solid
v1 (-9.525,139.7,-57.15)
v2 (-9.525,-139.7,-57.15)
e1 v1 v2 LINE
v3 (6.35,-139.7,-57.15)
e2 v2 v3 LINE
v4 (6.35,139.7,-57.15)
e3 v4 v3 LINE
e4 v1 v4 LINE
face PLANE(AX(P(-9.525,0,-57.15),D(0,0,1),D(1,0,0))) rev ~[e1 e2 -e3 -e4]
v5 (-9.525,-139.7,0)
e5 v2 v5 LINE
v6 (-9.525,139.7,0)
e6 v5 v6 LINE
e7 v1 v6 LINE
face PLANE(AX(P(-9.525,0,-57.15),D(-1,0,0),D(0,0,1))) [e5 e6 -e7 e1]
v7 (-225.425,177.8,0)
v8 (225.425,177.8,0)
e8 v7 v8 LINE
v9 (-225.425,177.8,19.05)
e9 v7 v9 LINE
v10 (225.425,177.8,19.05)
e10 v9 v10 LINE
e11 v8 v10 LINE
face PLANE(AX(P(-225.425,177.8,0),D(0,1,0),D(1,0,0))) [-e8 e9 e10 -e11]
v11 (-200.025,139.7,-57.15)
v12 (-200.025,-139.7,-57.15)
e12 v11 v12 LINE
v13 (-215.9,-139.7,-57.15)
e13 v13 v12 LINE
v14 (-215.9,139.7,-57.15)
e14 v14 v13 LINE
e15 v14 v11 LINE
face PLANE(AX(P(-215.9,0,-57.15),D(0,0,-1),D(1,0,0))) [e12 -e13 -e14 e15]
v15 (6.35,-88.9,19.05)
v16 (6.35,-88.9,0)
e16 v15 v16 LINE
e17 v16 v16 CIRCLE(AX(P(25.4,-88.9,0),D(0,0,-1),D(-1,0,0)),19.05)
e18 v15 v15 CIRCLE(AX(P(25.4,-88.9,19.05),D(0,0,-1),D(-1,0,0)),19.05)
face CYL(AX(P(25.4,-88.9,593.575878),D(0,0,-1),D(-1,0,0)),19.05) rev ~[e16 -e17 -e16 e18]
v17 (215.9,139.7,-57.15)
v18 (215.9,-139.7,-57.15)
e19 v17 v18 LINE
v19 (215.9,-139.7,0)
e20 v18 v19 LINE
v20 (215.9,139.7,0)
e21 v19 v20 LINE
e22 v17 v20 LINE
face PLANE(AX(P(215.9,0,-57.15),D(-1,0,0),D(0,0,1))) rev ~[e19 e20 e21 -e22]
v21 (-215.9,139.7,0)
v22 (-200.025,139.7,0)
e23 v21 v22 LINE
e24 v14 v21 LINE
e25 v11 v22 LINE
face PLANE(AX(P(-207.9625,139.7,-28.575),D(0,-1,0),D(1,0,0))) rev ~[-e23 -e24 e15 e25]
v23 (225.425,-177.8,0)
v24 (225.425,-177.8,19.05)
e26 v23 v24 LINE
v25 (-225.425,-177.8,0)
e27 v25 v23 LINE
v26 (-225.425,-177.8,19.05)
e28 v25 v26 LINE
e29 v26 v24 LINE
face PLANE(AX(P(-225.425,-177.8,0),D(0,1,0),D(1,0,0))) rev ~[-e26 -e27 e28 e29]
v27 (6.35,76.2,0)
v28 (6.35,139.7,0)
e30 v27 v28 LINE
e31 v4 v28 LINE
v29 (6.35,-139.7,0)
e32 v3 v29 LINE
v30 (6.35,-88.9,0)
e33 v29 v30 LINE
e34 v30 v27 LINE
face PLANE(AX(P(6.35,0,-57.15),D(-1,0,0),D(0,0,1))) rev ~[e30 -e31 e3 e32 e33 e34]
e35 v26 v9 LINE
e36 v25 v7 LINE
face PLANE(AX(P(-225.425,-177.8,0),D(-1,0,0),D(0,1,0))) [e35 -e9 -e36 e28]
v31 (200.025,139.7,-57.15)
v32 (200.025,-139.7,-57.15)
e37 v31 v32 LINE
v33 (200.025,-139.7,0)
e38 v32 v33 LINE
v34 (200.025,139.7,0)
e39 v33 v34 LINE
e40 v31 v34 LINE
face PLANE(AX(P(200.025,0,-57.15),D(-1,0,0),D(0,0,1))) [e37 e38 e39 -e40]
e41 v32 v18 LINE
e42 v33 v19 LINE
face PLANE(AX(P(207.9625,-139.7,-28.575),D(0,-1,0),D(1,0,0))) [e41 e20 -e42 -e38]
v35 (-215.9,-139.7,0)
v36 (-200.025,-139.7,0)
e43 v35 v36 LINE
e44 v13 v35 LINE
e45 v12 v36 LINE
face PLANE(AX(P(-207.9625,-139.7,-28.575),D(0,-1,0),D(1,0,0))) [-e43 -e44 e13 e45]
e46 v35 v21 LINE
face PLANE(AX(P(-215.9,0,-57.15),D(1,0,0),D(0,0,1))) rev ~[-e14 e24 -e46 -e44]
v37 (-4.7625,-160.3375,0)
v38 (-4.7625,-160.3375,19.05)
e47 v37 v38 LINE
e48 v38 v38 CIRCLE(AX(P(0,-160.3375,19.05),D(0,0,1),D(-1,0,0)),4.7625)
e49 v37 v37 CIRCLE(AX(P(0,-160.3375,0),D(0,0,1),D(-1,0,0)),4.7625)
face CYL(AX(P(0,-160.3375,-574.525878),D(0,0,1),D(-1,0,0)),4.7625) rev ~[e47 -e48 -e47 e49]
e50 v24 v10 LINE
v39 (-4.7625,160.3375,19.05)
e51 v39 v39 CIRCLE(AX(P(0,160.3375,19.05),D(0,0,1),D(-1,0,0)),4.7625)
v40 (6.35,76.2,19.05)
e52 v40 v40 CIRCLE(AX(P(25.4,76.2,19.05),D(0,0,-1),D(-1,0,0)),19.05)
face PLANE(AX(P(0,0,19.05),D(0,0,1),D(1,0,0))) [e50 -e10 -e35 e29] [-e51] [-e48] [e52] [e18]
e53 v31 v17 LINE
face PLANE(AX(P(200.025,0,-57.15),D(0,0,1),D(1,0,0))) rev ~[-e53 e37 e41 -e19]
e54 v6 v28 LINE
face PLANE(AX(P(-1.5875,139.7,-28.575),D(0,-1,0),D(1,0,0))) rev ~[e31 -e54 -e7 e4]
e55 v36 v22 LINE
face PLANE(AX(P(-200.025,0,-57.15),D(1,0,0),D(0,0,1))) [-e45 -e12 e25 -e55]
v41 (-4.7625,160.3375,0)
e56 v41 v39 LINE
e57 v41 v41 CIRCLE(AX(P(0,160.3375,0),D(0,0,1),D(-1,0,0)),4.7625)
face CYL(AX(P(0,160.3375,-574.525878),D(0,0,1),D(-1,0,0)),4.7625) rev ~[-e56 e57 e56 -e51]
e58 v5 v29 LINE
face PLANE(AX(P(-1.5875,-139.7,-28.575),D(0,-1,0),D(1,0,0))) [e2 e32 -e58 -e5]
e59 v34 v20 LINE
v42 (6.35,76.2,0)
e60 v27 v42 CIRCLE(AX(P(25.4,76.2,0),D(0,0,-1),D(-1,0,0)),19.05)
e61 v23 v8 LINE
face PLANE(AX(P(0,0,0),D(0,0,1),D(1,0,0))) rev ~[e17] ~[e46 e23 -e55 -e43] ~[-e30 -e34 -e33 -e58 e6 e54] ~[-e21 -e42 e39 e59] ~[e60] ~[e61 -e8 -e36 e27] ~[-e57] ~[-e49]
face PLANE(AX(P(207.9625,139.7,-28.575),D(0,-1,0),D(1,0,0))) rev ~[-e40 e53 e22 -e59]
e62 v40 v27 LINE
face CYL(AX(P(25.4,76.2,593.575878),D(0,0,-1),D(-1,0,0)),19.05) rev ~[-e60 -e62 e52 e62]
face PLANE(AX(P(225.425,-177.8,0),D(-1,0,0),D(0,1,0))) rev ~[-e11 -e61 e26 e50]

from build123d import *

# Parameters (mm, degrees)
F0_W     = 450.85
F0_H     = 355.6
F1_DEPTH = 19.05
F3_D     = 38.1
F5_D     = 9.525
F6_W     = 15.875
F6_H     = 57.15
F7_DEPTH = 139.7


# Not quite as in the source:
# - a length typed as a fraction of an inch, garbled in the dataset ("3 / 203.2 mm" for 3/8 in), is restored


with BuildPart() as f1:
    # F0 (on Top) → F1 (new body)
    with BuildSketch(Plane.XY):
        Rectangle(F0_W, F0_H)
    extrude(amount=F1_DEPTH)

    # F3 (through all)
    with Locations(Plane.XY.offset(19.05)):
        with Locations((25.4, 76.2), (25.4, -88.9)):
            Hole(F3_D / 2)

    # F5 (through all)
    with Locations(Plane(origin=(0, 0, 0), x_dir=(1, 0, 0), z_dir=(0, 0, -1))):
        with Locations((0, 160.3375), (0, -160.3375)):
            Hole(F5_D / 2)

    # F6 (on Front) → F7 (join, symmetric)
    with BuildSketch(Plane.XZ):
        with Locations((207.9625, -28.575)):
            Rectangle(F6_W, F6_H)
        with Locations((-1.5875, -28.575)):
            Rectangle(F6_W, F6_H)
        with Locations((-207.9625, -28.575)):
            Rectangle(F6_W, F6_H)
    extrude(amount=F7_DEPTH, both=True)


solid = f1.part
